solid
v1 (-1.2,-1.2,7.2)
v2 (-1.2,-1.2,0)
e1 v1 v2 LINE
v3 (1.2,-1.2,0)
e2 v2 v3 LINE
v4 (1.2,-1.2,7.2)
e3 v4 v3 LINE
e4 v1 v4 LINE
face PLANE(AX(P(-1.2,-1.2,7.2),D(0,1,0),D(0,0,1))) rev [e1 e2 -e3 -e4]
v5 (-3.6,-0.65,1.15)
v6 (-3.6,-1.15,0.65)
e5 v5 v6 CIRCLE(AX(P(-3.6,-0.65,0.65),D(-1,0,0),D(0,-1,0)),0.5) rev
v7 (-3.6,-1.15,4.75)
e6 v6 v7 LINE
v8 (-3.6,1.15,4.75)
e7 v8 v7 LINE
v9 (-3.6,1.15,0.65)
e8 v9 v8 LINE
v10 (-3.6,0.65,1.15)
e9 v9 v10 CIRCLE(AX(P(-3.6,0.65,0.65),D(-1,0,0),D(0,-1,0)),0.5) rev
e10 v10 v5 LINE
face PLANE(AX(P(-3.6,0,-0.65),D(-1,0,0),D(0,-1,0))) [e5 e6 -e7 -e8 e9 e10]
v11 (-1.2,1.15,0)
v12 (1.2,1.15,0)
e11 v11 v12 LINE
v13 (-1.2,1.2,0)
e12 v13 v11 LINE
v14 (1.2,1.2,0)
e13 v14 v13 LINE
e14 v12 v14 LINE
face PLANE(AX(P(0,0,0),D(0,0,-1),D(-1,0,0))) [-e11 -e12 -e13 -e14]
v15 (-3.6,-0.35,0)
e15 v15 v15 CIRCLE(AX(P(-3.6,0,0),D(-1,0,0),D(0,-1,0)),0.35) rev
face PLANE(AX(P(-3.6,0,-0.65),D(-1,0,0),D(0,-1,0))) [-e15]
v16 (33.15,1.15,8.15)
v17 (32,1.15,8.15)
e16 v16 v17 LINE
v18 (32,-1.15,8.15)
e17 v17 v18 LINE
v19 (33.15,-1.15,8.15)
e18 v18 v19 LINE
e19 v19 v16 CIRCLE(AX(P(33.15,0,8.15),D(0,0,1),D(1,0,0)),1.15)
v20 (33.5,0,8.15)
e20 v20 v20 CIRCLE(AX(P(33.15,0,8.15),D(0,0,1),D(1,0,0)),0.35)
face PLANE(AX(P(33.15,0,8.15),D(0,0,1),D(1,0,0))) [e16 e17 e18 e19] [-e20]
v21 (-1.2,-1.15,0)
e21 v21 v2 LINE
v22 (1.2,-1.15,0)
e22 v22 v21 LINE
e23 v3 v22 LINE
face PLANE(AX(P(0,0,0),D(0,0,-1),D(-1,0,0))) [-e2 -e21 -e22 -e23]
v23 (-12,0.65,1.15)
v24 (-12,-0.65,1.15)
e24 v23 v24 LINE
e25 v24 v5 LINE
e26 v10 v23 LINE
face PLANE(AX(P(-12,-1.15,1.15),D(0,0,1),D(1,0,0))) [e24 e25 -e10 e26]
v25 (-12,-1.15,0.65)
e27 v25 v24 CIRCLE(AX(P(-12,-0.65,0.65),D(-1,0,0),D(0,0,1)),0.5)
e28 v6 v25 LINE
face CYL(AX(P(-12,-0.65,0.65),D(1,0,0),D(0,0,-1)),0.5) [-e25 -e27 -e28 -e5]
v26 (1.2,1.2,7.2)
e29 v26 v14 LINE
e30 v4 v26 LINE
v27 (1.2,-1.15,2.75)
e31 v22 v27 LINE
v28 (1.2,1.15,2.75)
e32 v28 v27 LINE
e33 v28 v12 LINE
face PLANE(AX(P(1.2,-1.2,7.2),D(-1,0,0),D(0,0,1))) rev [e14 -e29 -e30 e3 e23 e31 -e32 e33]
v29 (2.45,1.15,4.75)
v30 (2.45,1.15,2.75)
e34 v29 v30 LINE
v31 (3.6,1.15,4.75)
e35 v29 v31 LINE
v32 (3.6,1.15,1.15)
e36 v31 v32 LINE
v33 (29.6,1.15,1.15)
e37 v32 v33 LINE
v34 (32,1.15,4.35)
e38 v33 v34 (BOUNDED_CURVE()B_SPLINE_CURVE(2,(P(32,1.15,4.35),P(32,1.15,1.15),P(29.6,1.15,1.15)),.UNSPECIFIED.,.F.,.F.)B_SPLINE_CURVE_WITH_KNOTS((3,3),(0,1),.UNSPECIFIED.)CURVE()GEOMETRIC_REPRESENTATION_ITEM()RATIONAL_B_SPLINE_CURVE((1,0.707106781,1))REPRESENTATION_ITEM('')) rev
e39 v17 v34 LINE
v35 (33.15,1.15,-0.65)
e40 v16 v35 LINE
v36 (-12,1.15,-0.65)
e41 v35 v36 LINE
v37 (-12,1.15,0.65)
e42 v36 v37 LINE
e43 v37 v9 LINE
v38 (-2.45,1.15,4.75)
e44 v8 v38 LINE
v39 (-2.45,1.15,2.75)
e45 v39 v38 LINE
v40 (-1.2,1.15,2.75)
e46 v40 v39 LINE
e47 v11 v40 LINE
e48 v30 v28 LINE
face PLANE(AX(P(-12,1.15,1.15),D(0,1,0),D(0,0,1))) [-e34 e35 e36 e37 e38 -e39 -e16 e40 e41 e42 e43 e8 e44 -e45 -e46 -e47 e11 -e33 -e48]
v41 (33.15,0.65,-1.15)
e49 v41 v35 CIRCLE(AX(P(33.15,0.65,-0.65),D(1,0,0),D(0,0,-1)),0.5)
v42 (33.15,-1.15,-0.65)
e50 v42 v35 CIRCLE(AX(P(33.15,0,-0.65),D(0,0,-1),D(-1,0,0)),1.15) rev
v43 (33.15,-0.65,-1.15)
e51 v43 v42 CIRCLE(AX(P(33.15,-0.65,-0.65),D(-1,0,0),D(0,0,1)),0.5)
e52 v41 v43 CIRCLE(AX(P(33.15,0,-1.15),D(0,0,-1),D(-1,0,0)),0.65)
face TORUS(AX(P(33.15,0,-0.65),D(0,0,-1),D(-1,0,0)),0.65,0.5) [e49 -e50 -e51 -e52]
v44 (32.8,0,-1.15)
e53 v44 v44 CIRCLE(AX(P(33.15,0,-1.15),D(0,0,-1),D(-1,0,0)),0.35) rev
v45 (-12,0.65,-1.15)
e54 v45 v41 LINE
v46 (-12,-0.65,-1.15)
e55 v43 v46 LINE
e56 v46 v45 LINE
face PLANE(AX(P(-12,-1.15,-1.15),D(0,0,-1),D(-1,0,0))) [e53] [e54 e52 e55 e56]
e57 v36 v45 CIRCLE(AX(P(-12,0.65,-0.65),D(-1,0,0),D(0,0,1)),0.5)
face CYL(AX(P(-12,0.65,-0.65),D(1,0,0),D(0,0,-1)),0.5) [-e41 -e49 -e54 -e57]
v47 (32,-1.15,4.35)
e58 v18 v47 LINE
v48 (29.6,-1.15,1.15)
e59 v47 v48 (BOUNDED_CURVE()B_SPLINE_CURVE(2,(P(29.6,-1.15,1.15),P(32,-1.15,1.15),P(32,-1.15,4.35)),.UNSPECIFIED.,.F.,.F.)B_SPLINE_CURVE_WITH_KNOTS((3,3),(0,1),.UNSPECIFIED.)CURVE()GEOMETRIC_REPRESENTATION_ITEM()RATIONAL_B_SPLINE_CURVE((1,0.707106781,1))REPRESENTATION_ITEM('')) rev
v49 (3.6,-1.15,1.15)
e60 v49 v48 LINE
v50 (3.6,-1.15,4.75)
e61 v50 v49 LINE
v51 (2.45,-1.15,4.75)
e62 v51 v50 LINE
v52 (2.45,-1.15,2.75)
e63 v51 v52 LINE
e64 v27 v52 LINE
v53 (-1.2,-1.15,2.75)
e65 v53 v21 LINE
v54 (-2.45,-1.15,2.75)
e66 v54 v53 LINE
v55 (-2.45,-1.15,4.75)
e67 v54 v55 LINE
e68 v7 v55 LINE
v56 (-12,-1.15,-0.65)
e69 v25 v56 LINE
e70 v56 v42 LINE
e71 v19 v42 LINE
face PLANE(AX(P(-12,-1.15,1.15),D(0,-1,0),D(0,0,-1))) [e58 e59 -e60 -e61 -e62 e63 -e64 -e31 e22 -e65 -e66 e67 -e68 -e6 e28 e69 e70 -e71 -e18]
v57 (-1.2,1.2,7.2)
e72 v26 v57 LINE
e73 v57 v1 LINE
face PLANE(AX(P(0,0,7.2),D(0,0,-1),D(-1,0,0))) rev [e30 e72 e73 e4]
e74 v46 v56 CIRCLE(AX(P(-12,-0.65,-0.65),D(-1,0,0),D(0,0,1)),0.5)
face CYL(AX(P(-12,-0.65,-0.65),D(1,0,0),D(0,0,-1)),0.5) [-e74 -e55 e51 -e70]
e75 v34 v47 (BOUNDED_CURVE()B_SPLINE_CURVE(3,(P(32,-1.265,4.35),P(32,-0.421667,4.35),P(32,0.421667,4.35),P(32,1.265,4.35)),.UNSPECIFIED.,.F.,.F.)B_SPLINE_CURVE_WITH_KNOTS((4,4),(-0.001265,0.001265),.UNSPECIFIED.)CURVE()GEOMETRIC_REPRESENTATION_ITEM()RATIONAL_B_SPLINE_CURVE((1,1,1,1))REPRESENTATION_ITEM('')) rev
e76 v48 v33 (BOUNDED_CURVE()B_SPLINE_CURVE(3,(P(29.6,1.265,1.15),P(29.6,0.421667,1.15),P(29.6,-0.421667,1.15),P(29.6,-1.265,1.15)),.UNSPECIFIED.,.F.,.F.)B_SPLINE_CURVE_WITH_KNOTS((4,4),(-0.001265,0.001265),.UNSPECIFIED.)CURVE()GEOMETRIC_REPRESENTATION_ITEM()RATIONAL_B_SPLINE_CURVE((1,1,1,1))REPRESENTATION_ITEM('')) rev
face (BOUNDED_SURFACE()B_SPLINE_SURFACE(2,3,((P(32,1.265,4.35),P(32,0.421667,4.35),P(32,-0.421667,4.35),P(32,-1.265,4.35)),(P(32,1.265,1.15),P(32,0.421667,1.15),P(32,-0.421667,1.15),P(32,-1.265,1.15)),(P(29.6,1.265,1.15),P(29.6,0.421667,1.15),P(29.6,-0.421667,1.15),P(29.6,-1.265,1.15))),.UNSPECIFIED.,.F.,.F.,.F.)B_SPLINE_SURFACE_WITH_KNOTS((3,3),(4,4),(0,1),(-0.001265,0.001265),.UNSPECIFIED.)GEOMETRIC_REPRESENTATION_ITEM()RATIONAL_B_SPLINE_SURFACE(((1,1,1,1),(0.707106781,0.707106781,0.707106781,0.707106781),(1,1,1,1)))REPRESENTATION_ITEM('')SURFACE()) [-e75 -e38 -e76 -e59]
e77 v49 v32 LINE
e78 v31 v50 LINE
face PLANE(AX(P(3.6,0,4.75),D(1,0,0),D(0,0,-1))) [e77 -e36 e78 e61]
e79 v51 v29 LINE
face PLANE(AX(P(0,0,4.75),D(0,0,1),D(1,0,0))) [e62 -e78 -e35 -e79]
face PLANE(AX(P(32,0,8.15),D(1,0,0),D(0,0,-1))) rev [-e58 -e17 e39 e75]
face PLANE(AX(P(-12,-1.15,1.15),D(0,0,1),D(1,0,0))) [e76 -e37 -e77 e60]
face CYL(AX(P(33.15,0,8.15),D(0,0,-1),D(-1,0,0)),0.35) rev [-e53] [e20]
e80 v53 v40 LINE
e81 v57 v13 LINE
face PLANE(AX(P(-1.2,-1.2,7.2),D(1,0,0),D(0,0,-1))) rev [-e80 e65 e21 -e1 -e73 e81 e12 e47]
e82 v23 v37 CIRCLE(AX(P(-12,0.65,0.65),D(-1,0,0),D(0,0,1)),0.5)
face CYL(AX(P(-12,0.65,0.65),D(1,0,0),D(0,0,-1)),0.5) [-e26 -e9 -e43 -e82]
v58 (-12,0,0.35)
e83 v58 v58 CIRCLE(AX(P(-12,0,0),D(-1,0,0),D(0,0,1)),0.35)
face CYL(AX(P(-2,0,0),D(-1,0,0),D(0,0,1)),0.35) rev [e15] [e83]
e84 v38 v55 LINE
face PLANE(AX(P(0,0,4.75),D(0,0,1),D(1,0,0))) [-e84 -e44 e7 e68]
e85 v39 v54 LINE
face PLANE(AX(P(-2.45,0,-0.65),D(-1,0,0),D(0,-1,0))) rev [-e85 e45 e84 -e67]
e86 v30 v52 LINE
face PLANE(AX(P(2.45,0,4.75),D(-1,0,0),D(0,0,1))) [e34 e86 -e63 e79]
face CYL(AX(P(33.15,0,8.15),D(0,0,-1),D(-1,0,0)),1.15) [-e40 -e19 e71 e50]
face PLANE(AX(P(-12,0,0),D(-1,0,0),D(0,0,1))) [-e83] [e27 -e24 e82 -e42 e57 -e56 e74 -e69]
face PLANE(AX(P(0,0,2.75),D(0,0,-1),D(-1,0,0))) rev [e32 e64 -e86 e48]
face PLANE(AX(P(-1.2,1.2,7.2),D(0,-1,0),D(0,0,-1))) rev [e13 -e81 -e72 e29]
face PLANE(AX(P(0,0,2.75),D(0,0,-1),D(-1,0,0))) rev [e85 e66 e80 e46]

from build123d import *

# Parameters (mm, degrees)
SKETCH_1_W           = 2.4
SKETCH_1_H           = 2.4
EXTRUDE_1_DEPTH      = 7.2
EXTRUDE_2_DEPTH      = 32
EXTRUDE_2_DEPTH_BACK = 12
SKETCH_4_W           = 2.3
SKETCH_4_H           = 2.3
EXTRUDE_3_DEPTH      = 7
EXTRUDE_3_DEPTH_BACK = 2.3
SKETCH_5_R           = 0.35
SKETCH_6_R           = 0.35
CUT_EXTRUDE_1_DEPTH  = 10
FILLET_1_SIZE        = 2.4
FILLET_1_SIZE_2      = 3.2
FILLET_2_R           = 0.5
EXTRUDE_START        = -1.5
SKETCH_7_W           = 1.15
SKETCH_7_H           = 0.5
SKETCH_7_H_2         = 1.3
SKETCH_7_H_3         = 2.3
EXTRUDE_4_DEPTH      = 5.1
SKETCH_8_W           = 7.2
SKETCH_8_H           = 2.3
EXTRUDE_5_DEPTH      = 3.1


with BuildPart() as part:
    # 草图1 → 凸台-拉伸1 (new body)
    with BuildSketch(Plane.XY):
        Rectangle(SKETCH_1_W, SKETCH_1_H)
    extrude(amount=EXTRUDE_1_DEPTH)

    # 草图4 → 凸台-拉伸2 (add, two sides: drawn at the far end of the back side and taken through both)
    with BuildSketch(Plane(origin=(0, 0, 0), x_dir=(0, 0, -1), z_dir=(1, 0, 0)).offset(-EXTRUDE_2_DEPTH_BACK)):
        Rectangle(SKETCH_4_W, SKETCH_4_H)
    extrude(amount=EXTRUDE_2_DEPTH + EXTRUDE_2_DEPTH_BACK)

    # 草图5 → 凸台-拉伸3 (add, two sides: drawn at the far end of the back side and taken through both)
    with BuildSketch(Plane.XY.offset(1.15).offset(-EXTRUDE_3_DEPTH_BACK)):
        with BuildLine():
            Line((32, 0), (32, 1.15))
            Line((32, 1.15), (33.15, 1.15))
            ThreePointArc((33.15, 1.15), (34.3, 0), (33.15, -1.15))
            Line((33.15, -1.15), (32, -1.15))
            Line((32, -1.15), (32, 0))
        make_face()
        with Locations(Location((33.15, 0, 0), (0, 0, 180))):
            Circle(SKETCH_5_R, mode=Mode.SUBTRACT)
    extrude(amount=EXTRUDE_3_DEPTH + EXTRUDE_3_DEPTH_BACK)

    # 草图6 → 切除-拉伸1 (cut)
    with BuildSketch(Plane.ZY.offset(12)):
        Circle(SKETCH_6_R)
    extrude(amount=-CUT_EXTRUDE_1_DEPTH, mode=Mode.SUBTRACT)

    # 圆角1
    # an asymmetric fillet: 3.2, 2.4 mm, written as the material it adds along each edge
    with BuildSketch(Plane(origin=(32, 1.15, 1.15), x_dir=(-1, 0, 0), z_dir=(0, -1, 0))) as fillet_1_piece_1:
        with BuildLine():
            Bezier((FILLET_1_SIZE, 0), (0, 0), (0, -FILLET_1_SIZE_2), weights=[1, 0.707106781, 1])
            Line((0, -FILLET_1_SIZE_2), (0, 0))
            Line((0, 0), (FILLET_1_SIZE, 0))
        make_face()
    extrude(amount=2.3)

    # 圆角2
    fillet_2_edges = [part.edges().sort_by_distance(p)[0] for p in [
        (-6.6, -1.15, 1.15),
        (10.575, -1.15, -1.15),
        (-6.6, 1.15, 1.15),
        (10.575, 1.15, -1.15),
        (34.3, 0, -1.15),
    ]]
    fillet(fillet_2_edges, radius=FILLET_2_R)

    # 草图7 → 凸台-拉伸4 (add)
    with BuildSketch(Plane.XY.offset(1.15).offset(EXTRUDE_START)):
        with Locations((-3.025, 0.9)):
            Rectangle(SKETCH_7_W, SKETCH_7_H)
        with Locations((-3.025, 0)):
            Rectangle(SKETCH_7_W, SKETCH_7_H_2)
        with Locations((-3.025, -0.9)):
            Rectangle(SKETCH_7_W, SKETCH_7_H)
        with Locations((3.025, 0)):
            Rectangle(SKETCH_7_W, SKETCH_7_H_3)
    extrude(amount=EXTRUDE_4_DEPTH)

    # 草图8 → 凸台-拉伸5 (add)
    with BuildSketch(Plane.XY.offset(1.15).offset(EXTRUDE_START)):
        Rectangle(SKETCH_8_W, SKETCH_8_H)
    extrude(amount=EXTRUDE_5_DEPTH)


solid = part.part
